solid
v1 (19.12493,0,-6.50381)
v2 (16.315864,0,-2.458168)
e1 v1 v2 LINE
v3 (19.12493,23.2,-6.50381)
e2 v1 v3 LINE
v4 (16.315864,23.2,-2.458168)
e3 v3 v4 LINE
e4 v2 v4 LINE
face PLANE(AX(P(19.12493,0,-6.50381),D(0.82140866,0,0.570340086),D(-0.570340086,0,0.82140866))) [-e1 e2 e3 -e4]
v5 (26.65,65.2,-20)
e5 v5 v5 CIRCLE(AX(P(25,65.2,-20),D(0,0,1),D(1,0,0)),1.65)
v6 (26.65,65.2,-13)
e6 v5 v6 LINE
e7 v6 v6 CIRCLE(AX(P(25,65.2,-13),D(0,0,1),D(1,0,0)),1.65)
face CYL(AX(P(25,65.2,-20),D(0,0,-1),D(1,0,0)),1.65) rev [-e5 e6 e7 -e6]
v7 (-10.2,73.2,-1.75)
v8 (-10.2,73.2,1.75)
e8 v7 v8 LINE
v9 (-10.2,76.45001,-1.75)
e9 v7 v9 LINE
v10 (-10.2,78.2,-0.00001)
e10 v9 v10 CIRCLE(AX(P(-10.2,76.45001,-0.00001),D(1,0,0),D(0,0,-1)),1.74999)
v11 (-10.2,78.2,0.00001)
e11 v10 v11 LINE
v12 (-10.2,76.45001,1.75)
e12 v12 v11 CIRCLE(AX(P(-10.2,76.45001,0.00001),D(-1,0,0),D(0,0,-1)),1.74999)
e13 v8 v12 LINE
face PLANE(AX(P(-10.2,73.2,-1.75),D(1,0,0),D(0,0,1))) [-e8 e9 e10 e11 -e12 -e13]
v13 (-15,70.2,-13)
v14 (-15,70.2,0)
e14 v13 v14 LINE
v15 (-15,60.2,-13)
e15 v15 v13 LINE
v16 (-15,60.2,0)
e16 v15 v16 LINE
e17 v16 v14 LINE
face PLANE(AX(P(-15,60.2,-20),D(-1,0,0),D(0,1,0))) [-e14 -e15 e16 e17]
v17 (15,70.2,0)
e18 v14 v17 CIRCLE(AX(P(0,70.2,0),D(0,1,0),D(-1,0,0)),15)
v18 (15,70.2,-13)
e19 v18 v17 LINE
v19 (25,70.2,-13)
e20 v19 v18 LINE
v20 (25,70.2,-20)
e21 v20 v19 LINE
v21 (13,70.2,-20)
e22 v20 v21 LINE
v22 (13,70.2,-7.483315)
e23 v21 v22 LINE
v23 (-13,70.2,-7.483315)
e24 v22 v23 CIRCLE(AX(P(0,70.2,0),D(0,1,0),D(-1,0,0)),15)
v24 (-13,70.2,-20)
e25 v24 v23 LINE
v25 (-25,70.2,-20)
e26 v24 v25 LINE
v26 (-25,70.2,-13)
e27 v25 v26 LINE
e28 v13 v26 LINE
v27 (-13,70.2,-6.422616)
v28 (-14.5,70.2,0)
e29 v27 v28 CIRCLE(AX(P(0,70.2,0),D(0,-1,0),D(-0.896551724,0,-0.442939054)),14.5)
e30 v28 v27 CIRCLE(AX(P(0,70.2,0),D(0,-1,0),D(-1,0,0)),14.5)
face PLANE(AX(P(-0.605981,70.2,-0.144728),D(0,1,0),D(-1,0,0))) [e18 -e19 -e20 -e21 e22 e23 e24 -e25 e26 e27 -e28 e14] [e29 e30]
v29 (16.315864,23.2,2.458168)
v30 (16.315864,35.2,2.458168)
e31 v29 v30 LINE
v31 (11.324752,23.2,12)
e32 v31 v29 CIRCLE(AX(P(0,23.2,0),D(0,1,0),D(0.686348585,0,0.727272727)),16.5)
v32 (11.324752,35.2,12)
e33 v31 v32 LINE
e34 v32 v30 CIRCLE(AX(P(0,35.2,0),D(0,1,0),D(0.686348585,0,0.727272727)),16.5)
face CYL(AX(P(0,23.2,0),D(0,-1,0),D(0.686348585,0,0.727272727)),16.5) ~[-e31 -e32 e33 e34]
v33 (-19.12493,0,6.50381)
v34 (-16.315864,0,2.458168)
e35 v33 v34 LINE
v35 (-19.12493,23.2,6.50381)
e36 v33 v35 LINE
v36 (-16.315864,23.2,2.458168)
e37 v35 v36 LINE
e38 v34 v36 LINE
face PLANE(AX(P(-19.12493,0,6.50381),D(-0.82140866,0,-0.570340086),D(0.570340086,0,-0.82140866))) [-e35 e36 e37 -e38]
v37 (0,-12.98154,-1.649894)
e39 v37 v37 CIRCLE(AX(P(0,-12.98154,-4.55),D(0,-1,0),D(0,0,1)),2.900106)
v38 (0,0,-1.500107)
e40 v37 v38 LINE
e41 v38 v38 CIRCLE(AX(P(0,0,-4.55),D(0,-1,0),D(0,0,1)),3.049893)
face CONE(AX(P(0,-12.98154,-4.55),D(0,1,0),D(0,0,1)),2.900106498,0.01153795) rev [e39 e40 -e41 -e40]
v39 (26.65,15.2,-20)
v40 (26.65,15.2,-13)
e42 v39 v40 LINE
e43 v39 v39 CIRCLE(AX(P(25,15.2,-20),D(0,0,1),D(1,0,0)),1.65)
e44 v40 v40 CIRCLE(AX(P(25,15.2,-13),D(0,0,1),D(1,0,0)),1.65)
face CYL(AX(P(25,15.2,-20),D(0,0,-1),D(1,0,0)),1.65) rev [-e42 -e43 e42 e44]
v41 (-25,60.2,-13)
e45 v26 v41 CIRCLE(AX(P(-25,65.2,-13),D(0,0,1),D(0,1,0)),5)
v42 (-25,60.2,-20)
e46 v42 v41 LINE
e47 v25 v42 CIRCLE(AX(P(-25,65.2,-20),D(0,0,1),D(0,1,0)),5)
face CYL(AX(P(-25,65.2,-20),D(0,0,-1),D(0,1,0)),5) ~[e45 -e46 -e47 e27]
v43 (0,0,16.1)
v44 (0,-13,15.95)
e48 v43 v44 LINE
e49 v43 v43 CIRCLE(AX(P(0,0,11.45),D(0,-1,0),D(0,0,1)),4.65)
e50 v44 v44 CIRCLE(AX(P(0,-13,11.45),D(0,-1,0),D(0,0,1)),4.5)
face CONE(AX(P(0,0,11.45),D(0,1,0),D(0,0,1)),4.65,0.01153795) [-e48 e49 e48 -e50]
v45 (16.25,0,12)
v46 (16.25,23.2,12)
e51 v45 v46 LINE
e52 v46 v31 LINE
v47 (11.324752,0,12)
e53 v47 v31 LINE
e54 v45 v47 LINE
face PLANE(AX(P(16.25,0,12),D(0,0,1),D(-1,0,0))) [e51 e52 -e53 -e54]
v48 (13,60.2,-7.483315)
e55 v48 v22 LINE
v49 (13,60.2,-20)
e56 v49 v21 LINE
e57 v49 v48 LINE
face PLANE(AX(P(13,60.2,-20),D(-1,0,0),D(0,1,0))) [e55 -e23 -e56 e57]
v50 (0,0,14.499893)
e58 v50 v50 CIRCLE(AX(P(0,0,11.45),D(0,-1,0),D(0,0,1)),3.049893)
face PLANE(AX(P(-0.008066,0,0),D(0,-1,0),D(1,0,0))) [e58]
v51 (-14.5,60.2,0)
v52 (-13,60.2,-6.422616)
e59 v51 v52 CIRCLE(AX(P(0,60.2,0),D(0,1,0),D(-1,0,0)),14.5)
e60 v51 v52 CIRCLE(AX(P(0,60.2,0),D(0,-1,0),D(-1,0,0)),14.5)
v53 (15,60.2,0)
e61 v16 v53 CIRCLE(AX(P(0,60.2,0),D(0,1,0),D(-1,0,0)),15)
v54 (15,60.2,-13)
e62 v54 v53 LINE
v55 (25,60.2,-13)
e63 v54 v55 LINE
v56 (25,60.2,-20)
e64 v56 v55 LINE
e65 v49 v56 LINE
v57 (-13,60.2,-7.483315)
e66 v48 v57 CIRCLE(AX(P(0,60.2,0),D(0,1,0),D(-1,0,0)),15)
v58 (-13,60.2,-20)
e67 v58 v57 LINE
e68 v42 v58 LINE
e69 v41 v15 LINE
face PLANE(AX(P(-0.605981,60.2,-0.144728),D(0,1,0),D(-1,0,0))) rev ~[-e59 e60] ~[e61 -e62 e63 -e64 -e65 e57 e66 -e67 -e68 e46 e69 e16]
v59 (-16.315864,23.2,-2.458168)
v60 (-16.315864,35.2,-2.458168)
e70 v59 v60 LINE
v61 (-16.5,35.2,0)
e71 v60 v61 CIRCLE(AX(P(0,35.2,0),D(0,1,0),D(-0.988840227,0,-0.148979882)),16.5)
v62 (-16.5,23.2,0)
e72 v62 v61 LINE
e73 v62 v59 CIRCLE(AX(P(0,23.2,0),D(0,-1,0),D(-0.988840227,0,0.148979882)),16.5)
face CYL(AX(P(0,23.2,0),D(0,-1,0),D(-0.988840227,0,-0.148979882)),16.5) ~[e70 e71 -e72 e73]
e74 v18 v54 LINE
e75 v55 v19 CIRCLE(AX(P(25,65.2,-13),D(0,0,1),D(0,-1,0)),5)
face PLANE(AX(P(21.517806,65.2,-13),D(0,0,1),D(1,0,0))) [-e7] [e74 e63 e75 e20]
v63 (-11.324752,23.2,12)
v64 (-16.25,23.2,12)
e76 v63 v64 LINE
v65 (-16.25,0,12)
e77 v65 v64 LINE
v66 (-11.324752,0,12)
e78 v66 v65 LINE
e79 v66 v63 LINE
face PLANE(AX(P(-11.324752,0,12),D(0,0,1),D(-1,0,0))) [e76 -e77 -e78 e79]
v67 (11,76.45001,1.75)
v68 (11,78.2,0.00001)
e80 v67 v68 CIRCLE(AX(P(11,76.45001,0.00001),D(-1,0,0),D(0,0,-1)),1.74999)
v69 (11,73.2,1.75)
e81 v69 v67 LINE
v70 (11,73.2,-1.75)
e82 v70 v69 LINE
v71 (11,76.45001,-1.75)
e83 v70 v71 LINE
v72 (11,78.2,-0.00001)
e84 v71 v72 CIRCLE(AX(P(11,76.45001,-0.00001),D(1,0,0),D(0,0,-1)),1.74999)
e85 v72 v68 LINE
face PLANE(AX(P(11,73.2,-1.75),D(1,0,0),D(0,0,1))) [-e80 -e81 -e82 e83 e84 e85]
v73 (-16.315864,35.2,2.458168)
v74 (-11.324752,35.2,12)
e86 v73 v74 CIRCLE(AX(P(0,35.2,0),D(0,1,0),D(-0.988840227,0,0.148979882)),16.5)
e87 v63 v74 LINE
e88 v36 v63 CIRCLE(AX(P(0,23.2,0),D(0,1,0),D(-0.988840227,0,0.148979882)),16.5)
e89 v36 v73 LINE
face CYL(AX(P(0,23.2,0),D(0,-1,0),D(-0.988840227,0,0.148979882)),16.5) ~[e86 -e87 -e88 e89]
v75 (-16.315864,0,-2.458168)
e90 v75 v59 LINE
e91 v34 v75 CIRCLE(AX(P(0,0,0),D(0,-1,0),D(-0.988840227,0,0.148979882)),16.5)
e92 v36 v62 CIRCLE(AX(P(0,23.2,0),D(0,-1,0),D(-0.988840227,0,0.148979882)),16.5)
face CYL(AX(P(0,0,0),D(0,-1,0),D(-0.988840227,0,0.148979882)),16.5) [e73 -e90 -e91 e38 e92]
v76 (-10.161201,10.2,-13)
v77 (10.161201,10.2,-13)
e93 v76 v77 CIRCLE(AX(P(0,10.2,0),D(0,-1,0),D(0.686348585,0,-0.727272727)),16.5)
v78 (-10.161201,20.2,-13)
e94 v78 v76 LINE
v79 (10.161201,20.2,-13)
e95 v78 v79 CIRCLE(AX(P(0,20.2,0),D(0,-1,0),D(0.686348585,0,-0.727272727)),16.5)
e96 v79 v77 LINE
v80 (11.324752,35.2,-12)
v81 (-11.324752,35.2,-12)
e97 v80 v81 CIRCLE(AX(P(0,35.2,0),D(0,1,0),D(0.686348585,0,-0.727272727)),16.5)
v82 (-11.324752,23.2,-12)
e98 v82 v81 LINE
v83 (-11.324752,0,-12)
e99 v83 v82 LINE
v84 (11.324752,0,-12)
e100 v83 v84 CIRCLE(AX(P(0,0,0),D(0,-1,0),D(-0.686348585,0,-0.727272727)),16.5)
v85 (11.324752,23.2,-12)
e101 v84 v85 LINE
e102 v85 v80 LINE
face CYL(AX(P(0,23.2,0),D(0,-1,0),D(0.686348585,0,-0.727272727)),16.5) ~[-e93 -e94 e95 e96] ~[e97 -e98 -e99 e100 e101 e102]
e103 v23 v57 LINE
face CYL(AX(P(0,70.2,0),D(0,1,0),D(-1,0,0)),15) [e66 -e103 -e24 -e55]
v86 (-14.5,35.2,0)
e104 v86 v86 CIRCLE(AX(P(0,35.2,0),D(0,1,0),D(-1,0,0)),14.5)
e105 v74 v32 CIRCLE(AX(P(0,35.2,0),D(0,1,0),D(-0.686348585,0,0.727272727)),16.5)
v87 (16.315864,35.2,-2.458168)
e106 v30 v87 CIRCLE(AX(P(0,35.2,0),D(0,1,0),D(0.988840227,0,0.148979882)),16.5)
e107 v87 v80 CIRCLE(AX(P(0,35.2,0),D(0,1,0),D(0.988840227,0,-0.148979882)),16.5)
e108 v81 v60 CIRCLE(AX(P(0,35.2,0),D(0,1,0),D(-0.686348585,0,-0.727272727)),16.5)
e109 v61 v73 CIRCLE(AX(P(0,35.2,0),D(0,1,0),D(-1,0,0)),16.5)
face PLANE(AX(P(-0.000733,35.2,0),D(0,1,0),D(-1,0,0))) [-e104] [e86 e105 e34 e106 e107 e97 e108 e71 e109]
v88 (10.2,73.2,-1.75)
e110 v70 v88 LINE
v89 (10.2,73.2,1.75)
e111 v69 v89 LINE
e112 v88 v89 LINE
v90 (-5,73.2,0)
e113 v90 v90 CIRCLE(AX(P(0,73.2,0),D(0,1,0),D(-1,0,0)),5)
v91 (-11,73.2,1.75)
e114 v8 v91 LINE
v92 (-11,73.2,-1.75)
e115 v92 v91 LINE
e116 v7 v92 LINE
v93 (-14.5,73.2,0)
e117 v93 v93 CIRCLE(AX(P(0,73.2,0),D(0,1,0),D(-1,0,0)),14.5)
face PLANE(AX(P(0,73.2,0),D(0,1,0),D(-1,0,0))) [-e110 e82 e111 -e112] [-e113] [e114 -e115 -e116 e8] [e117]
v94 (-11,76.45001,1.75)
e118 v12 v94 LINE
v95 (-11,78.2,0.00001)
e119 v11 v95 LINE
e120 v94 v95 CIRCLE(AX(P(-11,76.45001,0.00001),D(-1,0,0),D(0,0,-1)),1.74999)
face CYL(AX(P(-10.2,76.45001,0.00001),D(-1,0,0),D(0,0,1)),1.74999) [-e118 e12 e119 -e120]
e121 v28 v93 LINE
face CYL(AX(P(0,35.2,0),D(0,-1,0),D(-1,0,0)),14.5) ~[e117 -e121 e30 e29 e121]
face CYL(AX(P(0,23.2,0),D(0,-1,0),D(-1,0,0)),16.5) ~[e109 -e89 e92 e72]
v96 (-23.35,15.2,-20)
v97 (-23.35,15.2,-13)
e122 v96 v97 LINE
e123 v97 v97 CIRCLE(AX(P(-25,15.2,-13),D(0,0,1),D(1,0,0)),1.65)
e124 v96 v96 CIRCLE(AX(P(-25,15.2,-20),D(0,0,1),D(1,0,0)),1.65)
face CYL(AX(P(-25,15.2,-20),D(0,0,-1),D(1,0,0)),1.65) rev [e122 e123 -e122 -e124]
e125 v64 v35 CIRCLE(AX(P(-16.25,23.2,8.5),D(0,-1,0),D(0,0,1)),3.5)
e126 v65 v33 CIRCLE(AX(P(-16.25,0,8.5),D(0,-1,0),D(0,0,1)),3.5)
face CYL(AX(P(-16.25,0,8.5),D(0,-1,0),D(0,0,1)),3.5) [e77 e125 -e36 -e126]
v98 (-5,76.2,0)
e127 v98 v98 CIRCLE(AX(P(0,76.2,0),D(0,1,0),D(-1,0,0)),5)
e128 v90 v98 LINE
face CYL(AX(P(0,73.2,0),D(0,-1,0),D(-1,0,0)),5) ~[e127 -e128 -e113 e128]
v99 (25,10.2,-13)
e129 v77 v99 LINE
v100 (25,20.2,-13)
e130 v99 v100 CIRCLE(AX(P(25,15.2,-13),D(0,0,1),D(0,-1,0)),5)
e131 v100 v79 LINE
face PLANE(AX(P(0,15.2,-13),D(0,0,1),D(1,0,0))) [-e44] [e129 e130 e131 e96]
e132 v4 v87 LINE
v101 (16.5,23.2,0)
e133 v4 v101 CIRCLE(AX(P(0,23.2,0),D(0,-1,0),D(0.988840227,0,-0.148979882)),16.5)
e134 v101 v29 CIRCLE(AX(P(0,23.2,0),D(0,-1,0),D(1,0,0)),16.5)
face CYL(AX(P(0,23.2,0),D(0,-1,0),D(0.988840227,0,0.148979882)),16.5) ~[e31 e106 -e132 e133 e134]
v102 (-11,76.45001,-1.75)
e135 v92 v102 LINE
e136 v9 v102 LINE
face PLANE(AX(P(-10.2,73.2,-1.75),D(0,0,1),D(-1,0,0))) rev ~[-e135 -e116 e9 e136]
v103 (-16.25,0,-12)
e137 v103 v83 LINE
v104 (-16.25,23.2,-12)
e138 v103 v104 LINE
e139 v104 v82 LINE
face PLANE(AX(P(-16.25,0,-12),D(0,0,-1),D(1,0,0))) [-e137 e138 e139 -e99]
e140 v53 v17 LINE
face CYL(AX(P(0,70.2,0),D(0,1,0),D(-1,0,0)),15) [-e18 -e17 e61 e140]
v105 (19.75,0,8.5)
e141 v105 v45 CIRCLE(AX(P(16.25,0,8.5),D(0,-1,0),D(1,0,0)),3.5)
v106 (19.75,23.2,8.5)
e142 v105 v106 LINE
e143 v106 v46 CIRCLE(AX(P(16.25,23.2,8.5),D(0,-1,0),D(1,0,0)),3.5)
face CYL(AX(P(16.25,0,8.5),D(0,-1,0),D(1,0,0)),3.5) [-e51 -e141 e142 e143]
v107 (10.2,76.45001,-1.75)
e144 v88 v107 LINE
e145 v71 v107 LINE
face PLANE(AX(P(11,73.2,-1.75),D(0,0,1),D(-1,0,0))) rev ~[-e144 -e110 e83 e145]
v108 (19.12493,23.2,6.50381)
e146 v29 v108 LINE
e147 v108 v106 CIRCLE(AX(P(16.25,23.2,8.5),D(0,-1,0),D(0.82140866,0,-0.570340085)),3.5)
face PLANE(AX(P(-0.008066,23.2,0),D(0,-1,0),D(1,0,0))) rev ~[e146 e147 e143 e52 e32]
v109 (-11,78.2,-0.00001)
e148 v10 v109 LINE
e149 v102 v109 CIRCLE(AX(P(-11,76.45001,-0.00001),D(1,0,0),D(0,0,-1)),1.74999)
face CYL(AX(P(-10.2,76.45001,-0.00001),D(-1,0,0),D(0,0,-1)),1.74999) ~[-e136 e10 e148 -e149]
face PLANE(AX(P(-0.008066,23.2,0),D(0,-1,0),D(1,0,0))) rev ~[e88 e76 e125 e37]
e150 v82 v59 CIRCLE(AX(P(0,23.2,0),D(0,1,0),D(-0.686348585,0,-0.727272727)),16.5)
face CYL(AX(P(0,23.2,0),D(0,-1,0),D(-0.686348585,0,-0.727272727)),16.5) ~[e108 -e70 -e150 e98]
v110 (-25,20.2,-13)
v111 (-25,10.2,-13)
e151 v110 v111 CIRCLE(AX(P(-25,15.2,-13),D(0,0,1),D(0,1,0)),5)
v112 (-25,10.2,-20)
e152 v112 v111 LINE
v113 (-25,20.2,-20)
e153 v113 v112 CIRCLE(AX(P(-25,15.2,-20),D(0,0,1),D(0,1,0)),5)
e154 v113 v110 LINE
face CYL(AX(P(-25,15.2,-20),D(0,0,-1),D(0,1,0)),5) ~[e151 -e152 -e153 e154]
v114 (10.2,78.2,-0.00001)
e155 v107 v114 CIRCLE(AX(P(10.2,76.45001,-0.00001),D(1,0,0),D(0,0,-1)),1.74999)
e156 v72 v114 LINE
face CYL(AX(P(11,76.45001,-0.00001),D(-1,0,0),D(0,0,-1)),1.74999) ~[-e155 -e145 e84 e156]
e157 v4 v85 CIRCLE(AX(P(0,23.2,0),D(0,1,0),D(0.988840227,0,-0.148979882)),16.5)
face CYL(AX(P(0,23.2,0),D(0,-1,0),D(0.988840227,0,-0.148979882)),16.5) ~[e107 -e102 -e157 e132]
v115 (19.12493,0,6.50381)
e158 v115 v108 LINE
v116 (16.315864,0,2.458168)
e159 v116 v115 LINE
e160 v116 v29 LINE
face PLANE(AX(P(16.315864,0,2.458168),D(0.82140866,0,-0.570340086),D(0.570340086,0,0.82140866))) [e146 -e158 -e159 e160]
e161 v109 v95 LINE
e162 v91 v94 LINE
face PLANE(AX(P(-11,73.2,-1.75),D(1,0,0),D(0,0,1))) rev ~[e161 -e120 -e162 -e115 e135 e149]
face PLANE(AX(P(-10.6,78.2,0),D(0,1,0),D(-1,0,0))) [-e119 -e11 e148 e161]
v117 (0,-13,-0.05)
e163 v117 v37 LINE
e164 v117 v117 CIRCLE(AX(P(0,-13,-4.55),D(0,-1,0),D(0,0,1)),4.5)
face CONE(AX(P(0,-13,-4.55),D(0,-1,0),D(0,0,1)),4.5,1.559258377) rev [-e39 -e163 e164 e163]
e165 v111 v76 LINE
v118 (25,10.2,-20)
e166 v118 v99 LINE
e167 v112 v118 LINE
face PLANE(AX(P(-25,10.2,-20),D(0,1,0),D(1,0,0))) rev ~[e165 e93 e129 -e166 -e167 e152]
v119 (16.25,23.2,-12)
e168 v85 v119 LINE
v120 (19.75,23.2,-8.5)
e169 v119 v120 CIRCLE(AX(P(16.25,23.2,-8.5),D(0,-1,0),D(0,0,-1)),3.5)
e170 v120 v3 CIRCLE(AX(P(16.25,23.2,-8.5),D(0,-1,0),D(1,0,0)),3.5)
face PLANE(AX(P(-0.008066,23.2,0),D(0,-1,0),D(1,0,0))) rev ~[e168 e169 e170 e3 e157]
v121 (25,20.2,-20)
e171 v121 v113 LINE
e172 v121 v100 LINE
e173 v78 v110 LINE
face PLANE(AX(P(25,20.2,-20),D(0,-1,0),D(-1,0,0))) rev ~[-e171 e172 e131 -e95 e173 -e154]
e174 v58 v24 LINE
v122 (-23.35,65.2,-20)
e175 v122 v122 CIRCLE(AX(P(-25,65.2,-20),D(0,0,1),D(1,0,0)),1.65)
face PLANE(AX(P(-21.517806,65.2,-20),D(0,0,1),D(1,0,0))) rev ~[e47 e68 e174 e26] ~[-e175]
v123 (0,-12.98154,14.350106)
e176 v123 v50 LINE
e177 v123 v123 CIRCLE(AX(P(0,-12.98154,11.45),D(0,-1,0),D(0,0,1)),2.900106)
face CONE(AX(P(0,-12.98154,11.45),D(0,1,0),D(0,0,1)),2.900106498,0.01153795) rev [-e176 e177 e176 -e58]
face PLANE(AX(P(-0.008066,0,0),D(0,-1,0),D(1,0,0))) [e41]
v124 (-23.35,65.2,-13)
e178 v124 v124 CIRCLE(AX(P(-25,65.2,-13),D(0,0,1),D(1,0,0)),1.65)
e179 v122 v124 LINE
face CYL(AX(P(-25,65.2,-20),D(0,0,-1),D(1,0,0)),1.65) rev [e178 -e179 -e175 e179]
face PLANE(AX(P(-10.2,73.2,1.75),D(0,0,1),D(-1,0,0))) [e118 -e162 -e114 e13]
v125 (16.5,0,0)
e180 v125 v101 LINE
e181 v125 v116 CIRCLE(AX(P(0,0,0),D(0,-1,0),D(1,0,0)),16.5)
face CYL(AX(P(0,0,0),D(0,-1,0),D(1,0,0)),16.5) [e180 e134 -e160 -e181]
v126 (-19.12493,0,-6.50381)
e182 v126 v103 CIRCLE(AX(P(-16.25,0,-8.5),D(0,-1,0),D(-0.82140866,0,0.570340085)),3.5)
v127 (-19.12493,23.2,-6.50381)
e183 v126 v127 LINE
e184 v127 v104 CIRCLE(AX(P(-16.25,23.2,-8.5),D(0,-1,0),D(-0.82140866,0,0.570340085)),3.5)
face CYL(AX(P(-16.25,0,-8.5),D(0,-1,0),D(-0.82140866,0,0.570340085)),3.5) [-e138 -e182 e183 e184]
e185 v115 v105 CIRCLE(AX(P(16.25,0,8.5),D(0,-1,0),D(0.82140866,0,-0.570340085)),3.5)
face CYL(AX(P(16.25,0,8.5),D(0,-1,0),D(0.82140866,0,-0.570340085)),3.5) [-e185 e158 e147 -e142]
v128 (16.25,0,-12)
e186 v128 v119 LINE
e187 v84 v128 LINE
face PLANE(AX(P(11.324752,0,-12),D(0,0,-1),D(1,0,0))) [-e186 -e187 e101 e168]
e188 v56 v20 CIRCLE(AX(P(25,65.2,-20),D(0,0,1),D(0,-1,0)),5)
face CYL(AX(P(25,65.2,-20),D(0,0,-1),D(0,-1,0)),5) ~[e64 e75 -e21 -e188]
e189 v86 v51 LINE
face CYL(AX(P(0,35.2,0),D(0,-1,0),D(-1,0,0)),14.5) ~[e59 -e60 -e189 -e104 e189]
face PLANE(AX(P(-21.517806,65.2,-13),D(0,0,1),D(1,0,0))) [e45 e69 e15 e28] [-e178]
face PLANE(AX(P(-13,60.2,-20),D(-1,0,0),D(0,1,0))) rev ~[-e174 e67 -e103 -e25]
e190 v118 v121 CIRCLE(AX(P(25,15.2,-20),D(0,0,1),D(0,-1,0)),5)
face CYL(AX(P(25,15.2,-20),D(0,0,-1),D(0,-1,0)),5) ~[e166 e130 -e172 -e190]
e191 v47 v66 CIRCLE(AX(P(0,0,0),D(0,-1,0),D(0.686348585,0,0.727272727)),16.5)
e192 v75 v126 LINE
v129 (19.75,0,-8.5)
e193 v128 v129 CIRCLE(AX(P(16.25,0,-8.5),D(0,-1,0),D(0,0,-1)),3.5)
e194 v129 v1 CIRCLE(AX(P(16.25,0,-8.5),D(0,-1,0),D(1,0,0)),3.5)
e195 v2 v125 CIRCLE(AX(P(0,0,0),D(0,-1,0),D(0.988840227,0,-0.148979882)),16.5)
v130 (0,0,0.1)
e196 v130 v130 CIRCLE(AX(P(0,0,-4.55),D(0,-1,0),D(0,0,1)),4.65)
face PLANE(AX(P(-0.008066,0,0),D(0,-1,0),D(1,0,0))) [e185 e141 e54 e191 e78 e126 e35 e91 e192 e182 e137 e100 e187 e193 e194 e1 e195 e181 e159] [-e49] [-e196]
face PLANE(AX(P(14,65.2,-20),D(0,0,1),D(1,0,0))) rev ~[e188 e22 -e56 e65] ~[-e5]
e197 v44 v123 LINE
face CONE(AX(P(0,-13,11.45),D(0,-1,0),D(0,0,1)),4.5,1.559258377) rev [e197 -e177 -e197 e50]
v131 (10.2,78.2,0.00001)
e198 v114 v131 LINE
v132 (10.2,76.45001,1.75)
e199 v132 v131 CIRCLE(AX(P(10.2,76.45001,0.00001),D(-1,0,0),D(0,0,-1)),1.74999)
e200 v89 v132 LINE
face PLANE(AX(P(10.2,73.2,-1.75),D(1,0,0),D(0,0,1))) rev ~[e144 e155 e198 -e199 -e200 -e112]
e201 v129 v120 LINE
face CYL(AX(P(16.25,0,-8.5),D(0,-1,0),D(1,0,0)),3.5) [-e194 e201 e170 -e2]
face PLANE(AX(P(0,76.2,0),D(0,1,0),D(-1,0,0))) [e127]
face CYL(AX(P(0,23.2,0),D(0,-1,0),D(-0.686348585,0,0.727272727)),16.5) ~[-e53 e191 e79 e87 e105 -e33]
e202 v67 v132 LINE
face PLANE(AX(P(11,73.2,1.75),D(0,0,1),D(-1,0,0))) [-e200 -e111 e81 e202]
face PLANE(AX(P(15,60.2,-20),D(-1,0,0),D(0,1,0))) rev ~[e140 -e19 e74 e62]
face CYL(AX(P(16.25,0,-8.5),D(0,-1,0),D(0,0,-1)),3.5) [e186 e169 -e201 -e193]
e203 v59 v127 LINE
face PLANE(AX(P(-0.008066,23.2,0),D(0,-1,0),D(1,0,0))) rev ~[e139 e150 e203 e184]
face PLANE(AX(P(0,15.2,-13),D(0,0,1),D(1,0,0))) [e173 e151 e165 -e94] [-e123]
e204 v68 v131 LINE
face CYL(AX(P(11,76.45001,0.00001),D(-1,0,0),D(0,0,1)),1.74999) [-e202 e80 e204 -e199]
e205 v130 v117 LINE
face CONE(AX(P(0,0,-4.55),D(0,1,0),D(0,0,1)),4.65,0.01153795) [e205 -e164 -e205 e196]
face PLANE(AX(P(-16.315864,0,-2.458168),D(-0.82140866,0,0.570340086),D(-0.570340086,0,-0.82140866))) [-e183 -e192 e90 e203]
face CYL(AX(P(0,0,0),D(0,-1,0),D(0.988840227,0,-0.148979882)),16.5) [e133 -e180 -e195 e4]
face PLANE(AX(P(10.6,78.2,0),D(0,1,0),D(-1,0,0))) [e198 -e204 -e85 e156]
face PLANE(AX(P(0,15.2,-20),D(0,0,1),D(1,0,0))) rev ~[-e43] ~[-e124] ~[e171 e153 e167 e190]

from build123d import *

# Parameters (mm, degrees)
F1_DEPTH  = 23.2
F6_DEPTH  = 12
F7_R      = 14.5
F8_DEPTH  = 38
F9_R      = 5
F10_DEPTH = 3
F9_W      = 0.8
F9_H      = 3.5
F11_DEPTH = 5
F12_R     = 1.74999
F14_R     = 1.65
F15_DEPTH = 7
F14_W     = 2
F14_H     = 10
F16_DEPTH = 20
F17_DEPTH = 7
F19_DEPTH = 10


# Not quite as in the source:
# - a fillet or chamfer is up to 0.001 mm smaller than in the source, because OpenCascade refuses the exact size


with BuildPart() as f1:
    # F0 (on Front) → F1 (new body)
    with BuildSketch(Plane.XZ):
        with BuildLine():
            ThreePointArc((16.315863747, -2.4581680554), (16.4539015408, -1.2325275198), (16.5, 0))
            ThreePointArc((16.5, 0), (16.4539015408, 1.2325275198), (16.315863747, 2.4581680554))
            ThreePointArc((16.315863747, 2.4581680554), (16.0653724653, 3.7621546421), (15.710839713, 5.0417770192))
            ThreePointArc((15.710839713, 5.0417770192), (13.1486562552, 6.8777586565), (13.1018809709, 10.0294922616))
            ThreePointArc((13.1018809709, 10.0294922616), (12.2529923089, 11.0505284706), (11.3247516529, 12))
            Line((11.3247516529, 12), (-11.3247516529, 12))
            ThreePointArc((-11.3247516529, 12), (-12.2529923089, 11.0505284706), (-13.1018809709, 10.0294922616))
            ThreePointArc((-13.1018809709, 10.0294922616), (-12.8391044723, 9.2847239636), (-12.75, 8.5))
            ThreePointArc((-12.75, 8.5), (-13.5913291851, 6.2237158574), (-15.710839713, 5.0417770192))
            ThreePointArc((-15.710839713, 5.0417770192), (-16.0653724653, 3.7621546421), (-16.315863747, 2.4581680554))
            ThreePointArc((-16.315863747, 2.4581680554), (-16.5, 0), (-16.315863747, -2.4581680554))
            ThreePointArc((-16.315863747, -2.4581680554), (-16.0653724653, -3.7621546421), (-15.710839713, -5.0417770192))
            ThreePointArc((-15.710839713, -5.0417770192), (-13.5913291851, -6.2237158574), (-12.75, -8.5))
            ThreePointArc((-12.75, -8.5), (-12.8391044723, -9.2847239636), (-13.1018809709, -10.0294922616))
            ThreePointArc((-13.1018809709, -10.0294922616), (-12.2529923089, -11.0505284706), (-11.3247516529, -12))
            Line((-11.3247516529, -12), (11.3247516529, -12))
            ThreePointArc((11.3247516529, -12), (12.2529923089, -11.0505284706), (13.1018809709, -10.0294922616))
            ThreePointArc((13.1018809709, -10.0294922616), (13.1486562552, -6.8777586566), (15.710839713, -5.0417770192))
            ThreePointArc((15.710839713, -5.0417770192), (16.0653724653, -3.7621546421), (16.315863747, -2.4581680554))
        make_face()
        with BuildLine():
            ThreePointArc((11.3247516529, 12), (12.2529923089, 11.0505284706), (13.1018809709, 10.0294922616))
            ThreePointArc((13.1018809709, 10.0294922616), (14.3930162784, 11.4667509936), (16.25, 12))
            Line((16.25, 12), (11.3247516529, 12))
        make_face()
        with BuildLine():
            ThreePointArc((-12.75, 8.5), (-12.8391044723, 9.2847239636), (-13.1018809709, 10.0294922616))
            ThreePointArc((-13.1018809709, 10.0294922616), (-14.6206205113, 7.6477091905), (-15.710839713, 5.0417770192))
            ThreePointArc((-15.710839713, 5.0417770192), (-13.5913291851, 6.2237158574), (-12.75, 8.5))
        make_face()
        with BuildLine():
            ThreePointArc((-15.710839713, 5.0417770192), (-14.6206205113, 7.6477091905), (-13.1018809709, 10.0294922616))
            ThreePointArc((-13.1018809709, 10.0294922616), (-14.3930162784, 11.4667509936), (-16.25, 12))
            ThreePointArc((-16.25, 12), (-19.3513437448, 10.1222413434), (-19.1249303104, 6.5038097008))
            ThreePointArc((-19.1249303104, 6.5038097008), (-17.627802704, 5.2826004741), (-15.710839713, 5.0417770192))
        make_face()
        with BuildLine():
            Line((-16.25, -12), (-11.3247516529, -12))
            ThreePointArc((-11.3247516529, -12), (-12.2529923089, -11.0505284706), (-13.1018809709, -10.0294922616))
            ThreePointArc((-13.1018809709, -10.0294922616), (-14.3930162784, -11.4667509936), (-16.25, -12))
        make_face()
        with BuildLine():
            Line((-11.3247516529, 12), (11.3247516529, 12))
            ThreePointArc((11.3247516529, 12), (0, 16.5), (-11.3247516529, 12))
        make_face()
        with BuildLine():
            Line((19.1249303104, -6.5038097008), (16.315863747, -2.4581680554))
            ThreePointArc((16.315863747, -2.4581680554), (16.0653724653, -3.7621546421), (15.710839713, -5.0417770192))
            ThreePointArc((15.710839713, -5.0417770192), (17.627802704, -5.2826004741), (19.1249303104, -6.5038097008))
        make_face()
        with BuildLine():
            ThreePointArc((13.1018809709, 10.0294922616), (14.6206205113, 7.6477091905), (15.710839713, 5.0417770192))
            ThreePointArc((15.710839713, 5.0417770192), (17.627802704, 5.2826004741), (19.1249303104, 6.5038097008))
            ThreePointArc((19.1249303104, 6.5038097008), (19.5900790474, 7.4541166619), (19.75, 8.5))
            ThreePointArc((19.75, 8.5), (18.7248737342, 10.9748737342), (16.25, 12))
            ThreePointArc((16.25, 12), (14.3930162784, 11.4667509936), (13.1018809709, 10.0294922616))
        make_face()
        with BuildLine():
            ThreePointArc((-16.25, -12), (-14.3930162784, -11.4667509936), (-13.1018809709, -10.0294922616))
            ThreePointArc((-13.1018809709, -10.0294922616), (-14.6206205113, -7.6477091905), (-15.710839713, -5.0417770192))
            ThreePointArc((-15.710839713, -5.0417770192), (-17.627802704, -5.2826004741), (-19.1249303104, -6.5038097008))
            ThreePointArc((-19.1249303104, -6.5038097008), (-19.3513437448, -10.1222413434), (-16.25, -12))
        make_face()
        with BuildLine():
            ThreePointArc((16.25, -12), (14.3930162784, -11.4667509936), (13.1018809709, -10.0294922616))
            ThreePointArc((13.1018809709, -10.0294922616), (12.2529923089, -11.0505284706), (11.3247516529, -12))
            Line((11.3247516529, -12), (16.25, -12))
        make_face()
        with BuildLine():
            ThreePointArc((19.1249303104, -6.5038097008), (17.627802704, -5.2826004741), (15.710839713, -5.0417770192))
            ThreePointArc((15.710839713, -5.0417770192), (14.6206205113, -7.6477091905), (13.1018809709, -10.0294922616))
            ThreePointArc((13.1018809709, -10.0294922616), (14.3930162784, -11.4667509936), (16.25, -12))
            ThreePointArc((16.25, -12), (18.7248737342, -10.9748737342), (19.75, -8.5))
            ThreePointArc((19.75, -8.5), (19.5900790474, -7.4541166619), (19.1249303104, -6.5038097008))
        make_face()
        with BuildLine():
            ThreePointArc((-13.1018809709, 10.0294922616), (-12.2529923089, 11.0505284706), (-11.3247516529, 12))
            Line((-11.3247516529, 12), (-16.25, 12))
            ThreePointArc((-16.25, 12), (-14.3930162784, 11.4667509936), (-13.1018809709, 10.0294922616))
        make_face()
        with BuildLine():
            ThreePointArc((15.710839713, 5.0417770192), (16.0653724653, 3.7621546421), (16.315863747, 2.4581680554))
            Line((16.315863747, 2.4581680554), (19.1249303104, 6.5038097008))
            ThreePointArc((19.1249303104, 6.5038097008), (17.627802704, 5.2826004741), (15.710839713, 5.0417770192))
        make_face()
        with BuildLine():
            ThreePointArc((13.1018809709, 10.0294922616), (13.1486562552, 6.8777586565), (15.710839713, 5.0417770192))
            ThreePointArc((15.710839713, 5.0417770192), (14.6206205113, 7.6477091905), (13.1018809709, 10.0294922616))
        make_face()
        with BuildLine():
            ThreePointArc((13.1018809709, -10.0294922616), (14.6206205113, -7.6477091905), (15.710839713, -5.0417770192))
            ThreePointArc((15.710839713, -5.0417770192), (13.1486562552, -6.8777586566), (13.1018809709, -10.0294922616))
        make_face()
        with BuildLine():
            ThreePointArc((-19.1249303104, -6.5038097008), (-17.627802704, -5.2826004741), (-15.710839713, -5.0417770192))
            ThreePointArc((-15.710839713, -5.0417770192), (-16.0653724653, -3.7621546421), (-16.315863747, -2.4581680554))
            Line((-16.315863747, -2.4581680554), (-19.1249303104, -6.5038097008))
        make_face()
        with BuildLine():
            ThreePointArc((-15.710839713, -5.0417770192), (-14.6206205113, -7.6477091905), (-13.1018809709, -10.0294922616))
            ThreePointArc((-13.1018809709, -10.0294922616), (-12.8391044723, -9.2847239636), (-12.75, -8.5))
            ThreePointArc((-12.75, -8.5), (-13.5913291851, -6.2237158574), (-15.710839713, -5.0417770192))
        make_face()
        with BuildLine():
            ThreePointArc((-16.315863747, 2.4581680554), (-16.0653724653, 3.7621546421), (-15.710839713, 5.0417770192))
            ThreePointArc((-15.710839713, 5.0417770192), (-17.627802704, 5.2826004741), (-19.1249303104, 6.5038097008))
            Line((-19.1249303104, 6.5038097008), (-16.315863747, 2.4581680554))
        make_face()
        with BuildLine():
            ThreePointArc((-11.3247516529, -12), (0, -16.5), (11.3247516529, -12))
            Line((11.3247516529, -12), (-11.3247516529, -12))
        make_face()
    extrude(amount=-F1_DEPTH)

    # F2 (on Right) → F3 (revolve)
    with BuildSketch(Plane.YZ):
        Polygon((0, 14.4998934947), (0, 16.1), (-13, 15.95), (-12.9815396904, 14.3501064982), align=None)
    revolve(axis=Axis((0, -6.5, 11.45), (0, -1, 0)))

    # F2 (on Right) → F4 (revolve)
    with BuildSketch(Plane.YZ):
        Polygon((0, -1.5001065053), (0, 0.1), (-13, -0.05), (-12.9815396904, -1.6498935018), align=None)
    revolve(axis=Axis((0, -6.5, -4.55), (0, -1, 0)))

    # F5 (on face) → F6 (join)
    with BuildSketch(Plane(origin=(0, 23.2, 0), x_dir=(-1, 0, 0), z_dir=(0, 1, 0))):
        with BuildLine():
            ThreePointArc((16.315863747, -2.4581680554), (16.4539015408, -1.2325275198), (16.5, 0))
            ThreePointArc((16.5, 0), (16.4539015408, 1.2325275198), (16.315863747, 2.4581680554))
            ThreePointArc((16.315863747, 2.4581680554), (14.6206205113, 7.6477091906), (11.3247516529, 12))
            ThreePointArc((11.3247516529, 12), (0, 16.5), (-11.3247516529, 12))
            ThreePointArc((-11.3247516529, 12), (-14.6206205113, 7.6477091906), (-16.315863747, 2.4581680554))
            ThreePointArc((-16.315863747, 2.4581680554), (-16.5, 0), (-16.315863747, -2.4581680554))
            ThreePointArc((-16.315863747, -2.4581680554), (-14.6206205113, -7.6477091905), (-11.3247516529, -12))
            ThreePointArc((-11.3247516529, -12), (0, -16.5), (11.3247516529, -12))
            ThreePointArc((11.3247516529, -12), (14.6206205113, -7.6477091906), (16.315863747, -2.4581680554))
        make_face()
    extrude(amount=F6_DEPTH)

    # F7 (on face) → F8 (join)
    with BuildSketch(Plane(origin=(0, 35.2, 0), x_dir=(-1, 0, 0), z_dir=(0, 1, 0))):
        Circle(F7_R)
    extrude(amount=F8_DEPTH)

    # F9 (on face) → F10 (join)
    with BuildSketch(Plane(origin=(0, 73.2, 0), x_dir=(-1, 0, 0), z_dir=(0, 1, 0))):
        Circle(F9_R)
    extrude(amount=F10_DEPTH)

    # F9 (on face) → F11 (join)
    with BuildSketch(Plane(origin=(0, 73.2, 0), x_dir=(-1, 0, 0), z_dir=(0, 1, 0))):
        with Locations((-10.6, 0)):
            Rectangle(F9_W, F9_H)
        with Locations((10.6, 0)):
            Rectangle(F9_W, F9_H)
    extrude(amount=F11_DEPTH)

    # F12 (radius 1.75 in the source; OpenCascade refuses exactly that, so slightly less here)
    f12_edges = [f1.edges().sort_by_distance(p)[0] for p in [
        (-10.6, 78.2, -1.75),
        (-10.6, 78.2, 1.75),
        (10.6, 78.2, -1.75),
        (10.6, 78.2, 1.75),
    ]]
    fillet(f12_edges, radius=F12_R)

    # F14 (on offset) → F15 (join)
    with BuildSketch(Plane.XY.offset(-20)):
        with BuildLine():
            ThreePointArc((-25, 20.2), (-30, 15.2), (-25, 10.2))
            Line((-25, 10.2), (25, 10.2))
            ThreePointArc((25, 10.2), (30, 15.2), (25, 20.2))
            Line((25, 20.2), (-25, 20.2))
        make_face()
        with Locations((-25, 15.2)):
            Circle(F14_R, mode=Mode.SUBTRACT)
        with Locations((25, 15.2)):
            Circle(F14_R, mode=Mode.SUBTRACT)
    extrude(amount=F15_DEPTH)

    # F14 (on offset) → F16 (join)
    with BuildSketch(Plane.XY.offset(-20)):
        with Locations((-14, 65.2)):
            Rectangle(F14_W, F14_H)
        with Locations((14, 65.2)):
            Rectangle(F14_W, F14_H)
    extrude(amount=F16_DEPTH)

    # F14 (on offset) → F17 (join)
    with BuildSketch(Plane.XY.offset(-20)):
        with BuildLine():
            ThreePointArc((-25, 70.2), (-30, 65.2), (-25, 60.2))
            Line((-25, 60.2), (-15, 60.2))
            Line((-15, 60.2), (-15, 70.2))
            Line((-15, 70.2), (-25, 70.2))
        make_face()
        with Locations((-25, 65.2)):
            Circle(F14_R, mode=Mode.SUBTRACT)
        with BuildLine():
            Line((15, 70.2), (15, 60.2))
            Line((15, 60.2), (25, 60.2))
            ThreePointArc((25, 60.2), (30, 65.2), (25, 70.2))
            Line((25, 70.2), (15, 70.2))
        make_face()
        with Locations((25, 65.2)):
            Circle(F14_R, mode=Mode.SUBTRACT)
    extrude(amount=F17_DEPTH)

    # F18 (on face) → F19 (join, through all)
    with BuildSketch(Plane(origin=(0, 70.2, 0), x_dir=(-1, 0, 0), z_dir=(0, 1, 0))):
        with BuildLine():
            Line((14.5, 0), (15, 0))
            ThreePointArc((15, 0), (-14.4913767462, 3.8729833462), (13, -7.4833147735))
            Line((13, -7.4833147735), (13, -6.4226162893))
            ThreePointArc((13, -6.4226162893), (14.1200212464, -3.2977264896), (14.5, 0))
        make_face()
    extrude(amount=-F19_DEPTH)


solid = f1.part
